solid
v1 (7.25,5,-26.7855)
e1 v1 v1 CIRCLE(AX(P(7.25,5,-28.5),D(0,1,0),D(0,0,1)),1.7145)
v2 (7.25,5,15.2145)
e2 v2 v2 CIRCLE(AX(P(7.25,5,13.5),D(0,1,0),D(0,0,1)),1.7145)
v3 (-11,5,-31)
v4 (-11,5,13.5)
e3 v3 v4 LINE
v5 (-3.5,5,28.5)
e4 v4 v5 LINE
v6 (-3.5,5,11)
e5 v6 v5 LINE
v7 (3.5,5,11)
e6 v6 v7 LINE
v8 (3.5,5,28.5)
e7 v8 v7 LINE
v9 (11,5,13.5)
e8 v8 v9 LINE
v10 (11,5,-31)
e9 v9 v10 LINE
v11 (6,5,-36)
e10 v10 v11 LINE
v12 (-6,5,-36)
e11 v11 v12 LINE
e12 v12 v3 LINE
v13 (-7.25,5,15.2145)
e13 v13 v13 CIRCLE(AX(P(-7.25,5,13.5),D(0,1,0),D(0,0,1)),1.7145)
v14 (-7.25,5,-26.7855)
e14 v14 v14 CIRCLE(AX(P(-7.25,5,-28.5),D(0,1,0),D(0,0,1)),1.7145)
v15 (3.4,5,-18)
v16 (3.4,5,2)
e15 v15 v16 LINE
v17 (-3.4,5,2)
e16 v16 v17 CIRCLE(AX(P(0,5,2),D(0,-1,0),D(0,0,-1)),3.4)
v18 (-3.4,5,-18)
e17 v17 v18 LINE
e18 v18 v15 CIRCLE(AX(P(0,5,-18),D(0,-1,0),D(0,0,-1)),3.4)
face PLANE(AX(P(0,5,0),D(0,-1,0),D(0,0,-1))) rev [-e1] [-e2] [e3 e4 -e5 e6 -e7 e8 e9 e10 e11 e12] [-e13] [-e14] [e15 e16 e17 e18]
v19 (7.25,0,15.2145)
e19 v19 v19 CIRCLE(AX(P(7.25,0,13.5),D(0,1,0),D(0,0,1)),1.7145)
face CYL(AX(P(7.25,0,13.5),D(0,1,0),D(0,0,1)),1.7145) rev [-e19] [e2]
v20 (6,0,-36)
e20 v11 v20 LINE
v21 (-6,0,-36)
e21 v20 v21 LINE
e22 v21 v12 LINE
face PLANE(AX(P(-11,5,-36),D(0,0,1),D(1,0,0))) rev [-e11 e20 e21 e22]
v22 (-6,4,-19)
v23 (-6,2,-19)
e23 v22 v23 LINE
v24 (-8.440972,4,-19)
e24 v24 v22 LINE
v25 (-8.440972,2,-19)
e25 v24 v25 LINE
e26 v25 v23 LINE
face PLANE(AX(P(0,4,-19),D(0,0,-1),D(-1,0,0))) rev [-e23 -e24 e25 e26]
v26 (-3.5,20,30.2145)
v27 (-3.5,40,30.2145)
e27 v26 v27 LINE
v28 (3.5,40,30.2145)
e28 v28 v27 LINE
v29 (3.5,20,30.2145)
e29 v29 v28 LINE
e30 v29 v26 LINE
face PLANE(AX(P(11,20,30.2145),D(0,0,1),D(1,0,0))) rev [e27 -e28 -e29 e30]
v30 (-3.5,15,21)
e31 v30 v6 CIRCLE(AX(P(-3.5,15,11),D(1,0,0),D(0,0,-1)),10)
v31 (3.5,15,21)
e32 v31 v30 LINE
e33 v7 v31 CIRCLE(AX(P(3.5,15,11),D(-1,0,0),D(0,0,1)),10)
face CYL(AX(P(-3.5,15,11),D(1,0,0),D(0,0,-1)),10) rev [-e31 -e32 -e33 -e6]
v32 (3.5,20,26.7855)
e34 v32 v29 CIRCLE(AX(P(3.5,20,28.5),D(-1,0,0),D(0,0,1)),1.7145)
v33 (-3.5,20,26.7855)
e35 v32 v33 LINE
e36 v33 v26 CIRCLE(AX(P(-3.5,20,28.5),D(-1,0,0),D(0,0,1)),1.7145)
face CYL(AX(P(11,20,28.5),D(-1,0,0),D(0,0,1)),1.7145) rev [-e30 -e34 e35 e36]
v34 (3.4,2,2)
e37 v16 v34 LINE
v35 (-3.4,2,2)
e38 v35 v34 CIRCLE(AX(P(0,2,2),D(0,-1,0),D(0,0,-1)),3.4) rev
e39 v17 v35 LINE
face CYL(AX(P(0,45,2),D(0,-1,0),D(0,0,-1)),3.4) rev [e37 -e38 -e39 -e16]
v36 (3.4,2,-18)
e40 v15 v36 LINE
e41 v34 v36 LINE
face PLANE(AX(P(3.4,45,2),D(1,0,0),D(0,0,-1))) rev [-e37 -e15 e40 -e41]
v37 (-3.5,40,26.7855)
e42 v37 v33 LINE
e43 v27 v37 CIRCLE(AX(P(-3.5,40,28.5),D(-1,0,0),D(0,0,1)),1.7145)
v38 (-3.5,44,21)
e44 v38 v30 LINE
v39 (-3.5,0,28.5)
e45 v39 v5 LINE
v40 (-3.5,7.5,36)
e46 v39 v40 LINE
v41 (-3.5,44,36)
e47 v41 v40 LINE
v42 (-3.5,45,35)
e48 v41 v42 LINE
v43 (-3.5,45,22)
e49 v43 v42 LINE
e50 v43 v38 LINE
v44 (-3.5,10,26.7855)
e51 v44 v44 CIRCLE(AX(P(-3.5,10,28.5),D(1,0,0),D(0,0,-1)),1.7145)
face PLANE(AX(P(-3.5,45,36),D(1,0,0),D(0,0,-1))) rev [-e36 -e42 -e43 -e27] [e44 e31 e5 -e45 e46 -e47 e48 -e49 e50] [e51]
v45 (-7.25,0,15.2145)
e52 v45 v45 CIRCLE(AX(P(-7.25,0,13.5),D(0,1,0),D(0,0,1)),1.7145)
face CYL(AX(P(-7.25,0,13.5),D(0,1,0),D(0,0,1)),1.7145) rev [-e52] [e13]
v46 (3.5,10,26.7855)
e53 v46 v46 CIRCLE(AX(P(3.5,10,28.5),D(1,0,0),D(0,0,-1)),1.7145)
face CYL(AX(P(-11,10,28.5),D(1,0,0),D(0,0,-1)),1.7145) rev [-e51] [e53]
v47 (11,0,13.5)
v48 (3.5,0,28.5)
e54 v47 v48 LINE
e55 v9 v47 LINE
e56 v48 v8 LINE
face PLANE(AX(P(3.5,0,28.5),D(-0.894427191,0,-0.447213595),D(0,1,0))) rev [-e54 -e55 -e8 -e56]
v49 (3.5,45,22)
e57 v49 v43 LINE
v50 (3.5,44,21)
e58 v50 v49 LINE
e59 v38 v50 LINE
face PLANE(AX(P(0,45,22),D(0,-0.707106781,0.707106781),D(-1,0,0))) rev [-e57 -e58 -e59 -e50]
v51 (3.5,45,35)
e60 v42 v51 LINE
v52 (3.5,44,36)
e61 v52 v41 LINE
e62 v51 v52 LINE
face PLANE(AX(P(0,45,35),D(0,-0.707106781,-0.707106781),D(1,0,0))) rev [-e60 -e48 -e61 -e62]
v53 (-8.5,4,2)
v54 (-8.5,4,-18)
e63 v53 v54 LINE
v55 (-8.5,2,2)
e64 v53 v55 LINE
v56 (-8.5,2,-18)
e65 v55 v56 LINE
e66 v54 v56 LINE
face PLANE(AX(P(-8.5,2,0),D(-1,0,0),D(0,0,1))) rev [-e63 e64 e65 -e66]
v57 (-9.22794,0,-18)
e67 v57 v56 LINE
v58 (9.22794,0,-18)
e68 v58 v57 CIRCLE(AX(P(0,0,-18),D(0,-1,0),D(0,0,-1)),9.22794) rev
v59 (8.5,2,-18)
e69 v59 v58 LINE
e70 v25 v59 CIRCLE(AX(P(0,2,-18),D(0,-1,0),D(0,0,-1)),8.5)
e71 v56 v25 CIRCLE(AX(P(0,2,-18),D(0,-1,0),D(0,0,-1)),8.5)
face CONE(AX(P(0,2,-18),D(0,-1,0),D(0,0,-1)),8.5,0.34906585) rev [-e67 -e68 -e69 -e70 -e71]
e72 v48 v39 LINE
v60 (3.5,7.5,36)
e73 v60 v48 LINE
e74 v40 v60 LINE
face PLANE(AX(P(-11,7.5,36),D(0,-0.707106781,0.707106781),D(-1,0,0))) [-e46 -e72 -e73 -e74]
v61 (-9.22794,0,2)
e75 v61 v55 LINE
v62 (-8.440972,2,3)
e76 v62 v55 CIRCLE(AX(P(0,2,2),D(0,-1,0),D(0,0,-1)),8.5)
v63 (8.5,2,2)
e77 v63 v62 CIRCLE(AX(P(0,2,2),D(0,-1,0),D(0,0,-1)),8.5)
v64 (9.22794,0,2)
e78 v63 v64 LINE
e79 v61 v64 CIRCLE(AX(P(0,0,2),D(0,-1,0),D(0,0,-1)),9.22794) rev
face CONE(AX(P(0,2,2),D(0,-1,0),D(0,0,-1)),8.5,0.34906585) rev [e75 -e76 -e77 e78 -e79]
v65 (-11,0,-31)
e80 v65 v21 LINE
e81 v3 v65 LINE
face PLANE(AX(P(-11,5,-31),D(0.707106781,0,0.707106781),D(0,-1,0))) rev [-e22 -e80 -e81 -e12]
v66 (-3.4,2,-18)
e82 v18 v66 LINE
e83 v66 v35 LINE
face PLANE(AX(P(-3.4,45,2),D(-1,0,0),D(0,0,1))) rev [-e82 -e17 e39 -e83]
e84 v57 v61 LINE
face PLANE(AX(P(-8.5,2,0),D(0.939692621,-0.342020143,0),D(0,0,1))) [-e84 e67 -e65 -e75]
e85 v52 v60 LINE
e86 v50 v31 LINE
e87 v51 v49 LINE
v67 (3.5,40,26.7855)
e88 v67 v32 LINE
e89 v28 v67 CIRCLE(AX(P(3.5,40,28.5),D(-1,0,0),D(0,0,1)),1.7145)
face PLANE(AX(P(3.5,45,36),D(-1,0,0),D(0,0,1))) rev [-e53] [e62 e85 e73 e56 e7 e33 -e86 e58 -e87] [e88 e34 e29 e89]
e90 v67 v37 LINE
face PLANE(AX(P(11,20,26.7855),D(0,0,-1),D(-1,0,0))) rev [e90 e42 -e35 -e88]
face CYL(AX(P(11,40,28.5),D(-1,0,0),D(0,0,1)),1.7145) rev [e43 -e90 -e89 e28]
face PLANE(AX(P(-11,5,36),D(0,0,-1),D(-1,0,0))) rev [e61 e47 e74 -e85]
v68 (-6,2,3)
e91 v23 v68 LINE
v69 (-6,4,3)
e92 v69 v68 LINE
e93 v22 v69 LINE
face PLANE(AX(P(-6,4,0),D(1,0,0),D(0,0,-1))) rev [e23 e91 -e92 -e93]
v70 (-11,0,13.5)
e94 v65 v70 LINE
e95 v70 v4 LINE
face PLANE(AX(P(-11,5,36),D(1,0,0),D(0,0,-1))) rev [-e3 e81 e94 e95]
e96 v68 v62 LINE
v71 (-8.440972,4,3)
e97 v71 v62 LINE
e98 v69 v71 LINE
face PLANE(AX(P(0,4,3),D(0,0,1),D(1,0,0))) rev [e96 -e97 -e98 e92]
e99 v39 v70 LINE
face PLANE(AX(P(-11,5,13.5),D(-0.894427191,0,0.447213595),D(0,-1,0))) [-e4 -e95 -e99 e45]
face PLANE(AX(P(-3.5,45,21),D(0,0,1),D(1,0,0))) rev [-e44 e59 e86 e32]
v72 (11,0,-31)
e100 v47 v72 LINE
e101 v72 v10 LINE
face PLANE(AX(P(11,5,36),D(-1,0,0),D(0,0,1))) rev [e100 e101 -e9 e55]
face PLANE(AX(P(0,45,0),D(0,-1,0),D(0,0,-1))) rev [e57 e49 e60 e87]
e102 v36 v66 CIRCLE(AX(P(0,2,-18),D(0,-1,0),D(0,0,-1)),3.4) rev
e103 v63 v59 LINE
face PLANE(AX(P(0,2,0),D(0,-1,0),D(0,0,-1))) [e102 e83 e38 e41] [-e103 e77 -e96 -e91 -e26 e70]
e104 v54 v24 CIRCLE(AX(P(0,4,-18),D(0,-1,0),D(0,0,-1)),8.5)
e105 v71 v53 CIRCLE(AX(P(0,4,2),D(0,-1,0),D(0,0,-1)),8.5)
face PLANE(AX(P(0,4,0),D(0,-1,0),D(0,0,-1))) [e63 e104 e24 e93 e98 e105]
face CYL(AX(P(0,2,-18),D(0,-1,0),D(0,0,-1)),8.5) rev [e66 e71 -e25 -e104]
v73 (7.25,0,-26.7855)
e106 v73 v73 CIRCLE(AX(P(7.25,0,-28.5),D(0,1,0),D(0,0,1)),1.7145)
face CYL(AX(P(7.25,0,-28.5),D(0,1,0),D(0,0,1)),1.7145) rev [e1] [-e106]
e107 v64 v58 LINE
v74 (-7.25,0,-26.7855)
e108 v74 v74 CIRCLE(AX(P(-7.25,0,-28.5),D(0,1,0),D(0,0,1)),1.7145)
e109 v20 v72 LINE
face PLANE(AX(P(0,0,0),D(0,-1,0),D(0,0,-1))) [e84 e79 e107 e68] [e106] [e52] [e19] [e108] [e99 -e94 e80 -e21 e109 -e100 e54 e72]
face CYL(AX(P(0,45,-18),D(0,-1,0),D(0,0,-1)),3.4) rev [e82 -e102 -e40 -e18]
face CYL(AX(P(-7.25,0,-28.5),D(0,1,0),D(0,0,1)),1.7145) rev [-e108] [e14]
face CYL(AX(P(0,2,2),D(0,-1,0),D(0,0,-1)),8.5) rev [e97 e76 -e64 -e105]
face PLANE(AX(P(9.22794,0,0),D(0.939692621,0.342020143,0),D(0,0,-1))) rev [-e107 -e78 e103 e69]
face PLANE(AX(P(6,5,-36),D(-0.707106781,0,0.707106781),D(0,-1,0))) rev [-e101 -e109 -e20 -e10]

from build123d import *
from OCP.BRepFilletAPI import BRepFilletAPI_MakeChamfer

# Parameters (mm, degrees)
SKETCH1_W           = 22
SKETCH1_H           = 72
BOSS_EXTRUDE1_DEPTH = 5
SKETCH2_W           = 7
SKETCH2_H           = 15
BOSS_EXTRUDE2_DEPTH = 40
CHAMFER1_SIZE       = 1
FILLET1_R           = 10
CUT_EXTRUDE2_DEPTH  = 59.668560575
SKETCH6_W           = 7.5
SKETCH6_H           = 7.5
CUT_EXTRUDE3_DEPTH  = 55.927224579
CHAMFER2_SIZE2      = 15
CHAMFER2_SIZE       = 7.5
CHAMFER7_SIZE       = 7.5
CHAMFER3_SIZE       = 5
CUT_EXTRUDE6_DEPTH  = 2
CUT_EXTRUDE7_DEPTH  = 4
CHAMFER4_SIZE       = 2
CHAMFER4_SIZE_2     = 0.727940469
CUT_EXTRUDE8_DEPTH  = 60.42432162
CHAMFER8_SIZE2      = 7.5
CHAMFER8_SIZE       = 15
SKETCH12_R          = 1.7145
CUT_EXTRUDE9_DEPTH  = 60.42432162
SKETCH13_R          = 1.7145
CUT_EXTRUDE10_DEPTH = 55.927224579


with BuildPart() as part:
    # Sketch1 → Boss-Extrude1 (new body)
    with BuildSketch(Plane(origin=(0, 0, 0), x_dir=(1, 0, 0), z_dir=(0, 1, 0))):
        Rectangle(SKETCH1_W, SKETCH1_H)
    extrude(amount=BOSS_EXTRUDE1_DEPTH)

    # Sketch2 → Boss-Extrude2 (add)
    with BuildSketch(Plane(origin=(0, 5, 0), x_dir=(1, 0, 0), z_dir=(0, 1, 0))):
        with Locations((0, -28.5)):
            Rectangle(SKETCH2_W, SKETCH2_H)
    extrude(amount=BOSS_EXTRUDE2_DEPTH)

    # Chamfer1
    chamfer1_edges = [part.edges().sort_by_distance(p)[0] for p in [
        (0, 45, 36),
        (0, 45, 21),
    ]]
    chamfer(chamfer1_edges, length=CHAMFER1_SIZE)

    # Fillet1
    fillet1_edges = [part.edges().sort_by_distance(p)[0] for p in [
        (0, 5, 21),
    ]]
    fillet(fillet1_edges, radius=FILLET1_R)

    # Sketch5 → Cut-Extrude2 (cut, through all)
    with BuildSketch(Plane.XZ):
        with BuildLine():
            Line((3.4, 2), (3.4, -18))
            ThreePointArc((3.4, -18), (0, -21.4), (-3.4, -18))
            Line((-3.4, -18), (-3.4, 2))
            ThreePointArc((-3.4, 2), (0, 5.4), (3.4, 2))
        make_face()
    extrude(amount=-CUT_EXTRUDE2_DEPTH, mode=Mode.SUBTRACT)

    # Sketch6 → Cut-Extrude3 (cut, through all)
    with BuildSketch(Plane(origin=(0, 5, 0), x_dir=(1, 0, 0), z_dir=(0, 1, 0))):
        with Locations((7.25, -32.25)):
            Rectangle(SKETCH6_W, SKETCH6_H)
    cut_extrude3 = extrude(amount=-CUT_EXTRUDE3_DEPTH, mode=Mode.SUBTRACT)

    # Mirror1: Cut-Extrude3 across plane
    add(cut_extrude3.mirror(Plane(origin=(0, 0, 0), x_dir=(0, 0, 1), z_dir=(1, 0, 0))), mode=Mode.SUBTRACT)

    # Chamfer2
    chamfer2_edges = [part.edges().sort_by_distance(p)[0] for p in [
        (11, 2.5, 28.5),
    ]]
    chamfer2_side = [part.faces().sort_by_distance(p)[0] for p in [
        (10.85, 2.5, 28.5),
    ]]
    chamfer(chamfer2_edges, length=CHAMFER2_SIZE - 0.0001, length2=CHAMFER2_SIZE2 - 0.0001, reference=chamfer2_side[0])  # a hair under: the kernel refuses the full size

    # Chamfer7
    chamfer7_edges = [part.edges().sort_by_distance(p)[0] for p in [
        (0, 0, 36),
    ]]
    chamfer(chamfer7_edges, length=CHAMFER7_SIZE)

    # Chamfer3
    chamfer3_edges = [part.edges().sort_by_distance(p)[0] for p in [
        (-11, 2.5, -36),
        (11, 2.5, -36),
    ]]
    chamfer(chamfer3_edges, length=CHAMFER3_SIZE)

    # Sketch8 → Cut-Extrude6 (cut)
    # profile 1 of 2: a face of its own
    with BuildSketch(Plane.XZ):
        with BuildLine():
            Line((8.5, -18), (8.5, 2))
            ThreePointArc((8.5, 2), (0.500870333, 10.485230045), (-8.440971508, 3))
            Line((-8.440971508, 3), (-6, 3))
            Line((-6, 3), (-6, -19))
            Line((-6, -19), (-8.440971508, -19))
            ThreePointArc((-8.440971508, -19), (0.500870333, -26.485230045), (8.5, -18))
        make_face()
        with BuildLine():
            Line((-3.4, -18), (-3.4, 2))
            ThreePointArc((-3.4, 2), (0, 5.4), (3.4, 2))
            Line((3.4, 2), (3.4, -18))
            ThreePointArc((3.4, -18), (0, -21.4), (-3.4, -18))
        make_face(mode=Mode.SUBTRACT)
    # profile 2 of 2: a face of its own
    with BuildSketch(Plane.XZ):
        with BuildLine():
            Line((-6, 3), (-8.440971508, 3))
            ThreePointArc((-8.440971508, 3), (-8.485230045, 2.500870333), (-8.5, 2))
            Line((-8.5, 2), (-8.5, -18))
            ThreePointArc((-8.5, -18), (-8.485230045, -18.500870333), (-8.440971508, -19))
            Line((-8.440971508, -19), (-6, -19))
            Line((-6, -19), (-6, 3))
        make_face()
    extrude(amount=-CUT_EXTRUDE6_DEPTH, mode=Mode.SUBTRACT)

    # Sketch8<3> → Cut-Extrude7 (cut)
    with BuildSketch(Plane.XZ):
        with BuildLine():
            Line((-6, 3), (-8.440971508, 3))
            ThreePointArc((-8.440971508, 3), (-8.485230045, 2.500870333), (-8.5, 2))
            Line((-8.5, 2), (-8.5, -18))
            ThreePointArc((-8.5, -18), (-8.485230045, -18.500870333), (-8.440971508, -19))
            Line((-8.440971508, -19), (-6, -19))
            Line((-6, -19), (-6, 3))
        make_face()
    extrude(amount=-CUT_EXTRUDE7_DEPTH, mode=Mode.SUBTRACT)

    # Chamfer4
    chamfer4_edges_1 = [part.edges().sort_by_distance(p)[0] for p in [
        (8.5, 0, -8),
    ]]
    chamfer4_side_1 = [part.faces().sort_by_distance(p)[0] for p in [
        (8.5, 0.014558809, -8),
    ]]
    chamfer4_edges_2 = [part.edges().sort_by_distance(p)[0] for p in [
        (0, 0, -26.5),
    ]]
    chamfer4_side_2 = [part.faces().sort_by_distance(p)[0] for p in [
        (0, 0, -26.514558809),
    ]]
    chamfer4_edges_3 = [part.edges().sort_by_distance(p)[0] for p in [
        (0, 0, 10.5),
    ]]
    chamfer4_side_3 = [part.faces().sort_by_distance(p)[0] for p in [
        (0, 0, 10.514558809),
    ]]
    chamfer4_edges_4 = [part.edges().sort_by_distance(p)[0] for p in [
        (-8.5, 0, -8),
    ]]
    chamfer4_side_4 = [part.faces().sort_by_distance(p)[0] for p in [
        (-8.514558809, 0, -8),
    ]]
    chamfer4 = BRepFilletAPI_MakeChamfer(part.part.solid().wrapped)
    for e in chamfer4_edges_1:
        chamfer4.Add(CHAMFER4_SIZE - 0.0001, CHAMFER4_SIZE_2 - 0.0001, e.wrapped, chamfer4_side_1[0].wrapped)
    for e in chamfer4_edges_2:
        chamfer4.Add(CHAMFER4_SIZE - 0.0001, CHAMFER4_SIZE_2 - 0.0001, e.wrapped, chamfer4_side_2[0].wrapped)
    for e in chamfer4_edges_3:
        chamfer4.Add(CHAMFER4_SIZE - 0.0001, CHAMFER4_SIZE_2 - 0.0001, e.wrapped, chamfer4_side_3[0].wrapped)
    for e in chamfer4_edges_4:
        chamfer4.Add(CHAMFER4_SIZE - 0.0001, CHAMFER4_SIZE_2 - 0.0001, e.wrapped, chamfer4_side_4[0].wrapped)
    add(Compound.cast(chamfer4.Shape()), mode=Mode.REPLACE)  # a hair under: the kernel refuses the full size

    # Sketch9 → Cut-Extrude8 (cut, through all)
    with BuildSketch(Plane.ZY.offset(3.5)):
        with BuildLine():
            Line((26.7855, 20), (26.7855, 40))
            ThreePointArc((26.7855, 40), (28.5, 41.7145), (30.2145, 40))
            Line((30.2145, 40), (30.2145, 20))
            ThreePointArc((30.2145, 20), (28.5, 18.2855), (26.7855, 20))
        make_face()
    extrude(amount=-CUT_EXTRUDE8_DEPTH, mode=Mode.SUBTRACT)

    # Chamfer8
    chamfer8_edges = [part.edges().sort_by_distance(p)[0] for p in [
        (-11, 2.5, 28.5),
    ]]
    chamfer8_side = [part.faces().sort_by_distance(p)[0] for p in [
        (-11, 2.5, 28.35),
    ]]
    chamfer(chamfer8_edges, length=CHAMFER8_SIZE - 0.0001, length2=CHAMFER8_SIZE2 - 0.0001, reference=chamfer8_side[0])  # a hair under: the kernel refuses the full size

    # Sketch12 → Cut-Extrude9 (cut, through all)
    with BuildSketch(Plane(origin=(3.5, 0, 0), x_dir=(0, 0, -1), z_dir=(1, 0, 0))):
        with Locations((-28.5, 10)):
            Circle(SKETCH12_R)
    extrude(amount=-CUT_EXTRUDE9_DEPTH, mode=Mode.SUBTRACT)

    # Sketch13 → Cut-Extrude10 (cut, through all)
    with BuildSketch(Plane(origin=(0, 5, 0), x_dir=(1, 0, 0), z_dir=(0, 1, 0))):
        with Locations(Location((-7.25, -13.5, 0), (0, 0, 270))):
            Circle(SKETCH13_R)
        with Locations(Location((7.25, -13.5, 0), (0, 0, 270))):
            Circle(SKETCH13_R)
        with Locations(Location((-7.25, 28.5, 0), (0, 0, 270))):
            Circle(SKETCH13_R)
        with Locations(Location((7.25, 28.5, 0), (0, 0, 270))):
            Circle(SKETCH13_R)
    extrude(amount=-CUT_EXTRUDE10_DEPTH, mode=Mode.SUBTRACT)


solid = part.part
